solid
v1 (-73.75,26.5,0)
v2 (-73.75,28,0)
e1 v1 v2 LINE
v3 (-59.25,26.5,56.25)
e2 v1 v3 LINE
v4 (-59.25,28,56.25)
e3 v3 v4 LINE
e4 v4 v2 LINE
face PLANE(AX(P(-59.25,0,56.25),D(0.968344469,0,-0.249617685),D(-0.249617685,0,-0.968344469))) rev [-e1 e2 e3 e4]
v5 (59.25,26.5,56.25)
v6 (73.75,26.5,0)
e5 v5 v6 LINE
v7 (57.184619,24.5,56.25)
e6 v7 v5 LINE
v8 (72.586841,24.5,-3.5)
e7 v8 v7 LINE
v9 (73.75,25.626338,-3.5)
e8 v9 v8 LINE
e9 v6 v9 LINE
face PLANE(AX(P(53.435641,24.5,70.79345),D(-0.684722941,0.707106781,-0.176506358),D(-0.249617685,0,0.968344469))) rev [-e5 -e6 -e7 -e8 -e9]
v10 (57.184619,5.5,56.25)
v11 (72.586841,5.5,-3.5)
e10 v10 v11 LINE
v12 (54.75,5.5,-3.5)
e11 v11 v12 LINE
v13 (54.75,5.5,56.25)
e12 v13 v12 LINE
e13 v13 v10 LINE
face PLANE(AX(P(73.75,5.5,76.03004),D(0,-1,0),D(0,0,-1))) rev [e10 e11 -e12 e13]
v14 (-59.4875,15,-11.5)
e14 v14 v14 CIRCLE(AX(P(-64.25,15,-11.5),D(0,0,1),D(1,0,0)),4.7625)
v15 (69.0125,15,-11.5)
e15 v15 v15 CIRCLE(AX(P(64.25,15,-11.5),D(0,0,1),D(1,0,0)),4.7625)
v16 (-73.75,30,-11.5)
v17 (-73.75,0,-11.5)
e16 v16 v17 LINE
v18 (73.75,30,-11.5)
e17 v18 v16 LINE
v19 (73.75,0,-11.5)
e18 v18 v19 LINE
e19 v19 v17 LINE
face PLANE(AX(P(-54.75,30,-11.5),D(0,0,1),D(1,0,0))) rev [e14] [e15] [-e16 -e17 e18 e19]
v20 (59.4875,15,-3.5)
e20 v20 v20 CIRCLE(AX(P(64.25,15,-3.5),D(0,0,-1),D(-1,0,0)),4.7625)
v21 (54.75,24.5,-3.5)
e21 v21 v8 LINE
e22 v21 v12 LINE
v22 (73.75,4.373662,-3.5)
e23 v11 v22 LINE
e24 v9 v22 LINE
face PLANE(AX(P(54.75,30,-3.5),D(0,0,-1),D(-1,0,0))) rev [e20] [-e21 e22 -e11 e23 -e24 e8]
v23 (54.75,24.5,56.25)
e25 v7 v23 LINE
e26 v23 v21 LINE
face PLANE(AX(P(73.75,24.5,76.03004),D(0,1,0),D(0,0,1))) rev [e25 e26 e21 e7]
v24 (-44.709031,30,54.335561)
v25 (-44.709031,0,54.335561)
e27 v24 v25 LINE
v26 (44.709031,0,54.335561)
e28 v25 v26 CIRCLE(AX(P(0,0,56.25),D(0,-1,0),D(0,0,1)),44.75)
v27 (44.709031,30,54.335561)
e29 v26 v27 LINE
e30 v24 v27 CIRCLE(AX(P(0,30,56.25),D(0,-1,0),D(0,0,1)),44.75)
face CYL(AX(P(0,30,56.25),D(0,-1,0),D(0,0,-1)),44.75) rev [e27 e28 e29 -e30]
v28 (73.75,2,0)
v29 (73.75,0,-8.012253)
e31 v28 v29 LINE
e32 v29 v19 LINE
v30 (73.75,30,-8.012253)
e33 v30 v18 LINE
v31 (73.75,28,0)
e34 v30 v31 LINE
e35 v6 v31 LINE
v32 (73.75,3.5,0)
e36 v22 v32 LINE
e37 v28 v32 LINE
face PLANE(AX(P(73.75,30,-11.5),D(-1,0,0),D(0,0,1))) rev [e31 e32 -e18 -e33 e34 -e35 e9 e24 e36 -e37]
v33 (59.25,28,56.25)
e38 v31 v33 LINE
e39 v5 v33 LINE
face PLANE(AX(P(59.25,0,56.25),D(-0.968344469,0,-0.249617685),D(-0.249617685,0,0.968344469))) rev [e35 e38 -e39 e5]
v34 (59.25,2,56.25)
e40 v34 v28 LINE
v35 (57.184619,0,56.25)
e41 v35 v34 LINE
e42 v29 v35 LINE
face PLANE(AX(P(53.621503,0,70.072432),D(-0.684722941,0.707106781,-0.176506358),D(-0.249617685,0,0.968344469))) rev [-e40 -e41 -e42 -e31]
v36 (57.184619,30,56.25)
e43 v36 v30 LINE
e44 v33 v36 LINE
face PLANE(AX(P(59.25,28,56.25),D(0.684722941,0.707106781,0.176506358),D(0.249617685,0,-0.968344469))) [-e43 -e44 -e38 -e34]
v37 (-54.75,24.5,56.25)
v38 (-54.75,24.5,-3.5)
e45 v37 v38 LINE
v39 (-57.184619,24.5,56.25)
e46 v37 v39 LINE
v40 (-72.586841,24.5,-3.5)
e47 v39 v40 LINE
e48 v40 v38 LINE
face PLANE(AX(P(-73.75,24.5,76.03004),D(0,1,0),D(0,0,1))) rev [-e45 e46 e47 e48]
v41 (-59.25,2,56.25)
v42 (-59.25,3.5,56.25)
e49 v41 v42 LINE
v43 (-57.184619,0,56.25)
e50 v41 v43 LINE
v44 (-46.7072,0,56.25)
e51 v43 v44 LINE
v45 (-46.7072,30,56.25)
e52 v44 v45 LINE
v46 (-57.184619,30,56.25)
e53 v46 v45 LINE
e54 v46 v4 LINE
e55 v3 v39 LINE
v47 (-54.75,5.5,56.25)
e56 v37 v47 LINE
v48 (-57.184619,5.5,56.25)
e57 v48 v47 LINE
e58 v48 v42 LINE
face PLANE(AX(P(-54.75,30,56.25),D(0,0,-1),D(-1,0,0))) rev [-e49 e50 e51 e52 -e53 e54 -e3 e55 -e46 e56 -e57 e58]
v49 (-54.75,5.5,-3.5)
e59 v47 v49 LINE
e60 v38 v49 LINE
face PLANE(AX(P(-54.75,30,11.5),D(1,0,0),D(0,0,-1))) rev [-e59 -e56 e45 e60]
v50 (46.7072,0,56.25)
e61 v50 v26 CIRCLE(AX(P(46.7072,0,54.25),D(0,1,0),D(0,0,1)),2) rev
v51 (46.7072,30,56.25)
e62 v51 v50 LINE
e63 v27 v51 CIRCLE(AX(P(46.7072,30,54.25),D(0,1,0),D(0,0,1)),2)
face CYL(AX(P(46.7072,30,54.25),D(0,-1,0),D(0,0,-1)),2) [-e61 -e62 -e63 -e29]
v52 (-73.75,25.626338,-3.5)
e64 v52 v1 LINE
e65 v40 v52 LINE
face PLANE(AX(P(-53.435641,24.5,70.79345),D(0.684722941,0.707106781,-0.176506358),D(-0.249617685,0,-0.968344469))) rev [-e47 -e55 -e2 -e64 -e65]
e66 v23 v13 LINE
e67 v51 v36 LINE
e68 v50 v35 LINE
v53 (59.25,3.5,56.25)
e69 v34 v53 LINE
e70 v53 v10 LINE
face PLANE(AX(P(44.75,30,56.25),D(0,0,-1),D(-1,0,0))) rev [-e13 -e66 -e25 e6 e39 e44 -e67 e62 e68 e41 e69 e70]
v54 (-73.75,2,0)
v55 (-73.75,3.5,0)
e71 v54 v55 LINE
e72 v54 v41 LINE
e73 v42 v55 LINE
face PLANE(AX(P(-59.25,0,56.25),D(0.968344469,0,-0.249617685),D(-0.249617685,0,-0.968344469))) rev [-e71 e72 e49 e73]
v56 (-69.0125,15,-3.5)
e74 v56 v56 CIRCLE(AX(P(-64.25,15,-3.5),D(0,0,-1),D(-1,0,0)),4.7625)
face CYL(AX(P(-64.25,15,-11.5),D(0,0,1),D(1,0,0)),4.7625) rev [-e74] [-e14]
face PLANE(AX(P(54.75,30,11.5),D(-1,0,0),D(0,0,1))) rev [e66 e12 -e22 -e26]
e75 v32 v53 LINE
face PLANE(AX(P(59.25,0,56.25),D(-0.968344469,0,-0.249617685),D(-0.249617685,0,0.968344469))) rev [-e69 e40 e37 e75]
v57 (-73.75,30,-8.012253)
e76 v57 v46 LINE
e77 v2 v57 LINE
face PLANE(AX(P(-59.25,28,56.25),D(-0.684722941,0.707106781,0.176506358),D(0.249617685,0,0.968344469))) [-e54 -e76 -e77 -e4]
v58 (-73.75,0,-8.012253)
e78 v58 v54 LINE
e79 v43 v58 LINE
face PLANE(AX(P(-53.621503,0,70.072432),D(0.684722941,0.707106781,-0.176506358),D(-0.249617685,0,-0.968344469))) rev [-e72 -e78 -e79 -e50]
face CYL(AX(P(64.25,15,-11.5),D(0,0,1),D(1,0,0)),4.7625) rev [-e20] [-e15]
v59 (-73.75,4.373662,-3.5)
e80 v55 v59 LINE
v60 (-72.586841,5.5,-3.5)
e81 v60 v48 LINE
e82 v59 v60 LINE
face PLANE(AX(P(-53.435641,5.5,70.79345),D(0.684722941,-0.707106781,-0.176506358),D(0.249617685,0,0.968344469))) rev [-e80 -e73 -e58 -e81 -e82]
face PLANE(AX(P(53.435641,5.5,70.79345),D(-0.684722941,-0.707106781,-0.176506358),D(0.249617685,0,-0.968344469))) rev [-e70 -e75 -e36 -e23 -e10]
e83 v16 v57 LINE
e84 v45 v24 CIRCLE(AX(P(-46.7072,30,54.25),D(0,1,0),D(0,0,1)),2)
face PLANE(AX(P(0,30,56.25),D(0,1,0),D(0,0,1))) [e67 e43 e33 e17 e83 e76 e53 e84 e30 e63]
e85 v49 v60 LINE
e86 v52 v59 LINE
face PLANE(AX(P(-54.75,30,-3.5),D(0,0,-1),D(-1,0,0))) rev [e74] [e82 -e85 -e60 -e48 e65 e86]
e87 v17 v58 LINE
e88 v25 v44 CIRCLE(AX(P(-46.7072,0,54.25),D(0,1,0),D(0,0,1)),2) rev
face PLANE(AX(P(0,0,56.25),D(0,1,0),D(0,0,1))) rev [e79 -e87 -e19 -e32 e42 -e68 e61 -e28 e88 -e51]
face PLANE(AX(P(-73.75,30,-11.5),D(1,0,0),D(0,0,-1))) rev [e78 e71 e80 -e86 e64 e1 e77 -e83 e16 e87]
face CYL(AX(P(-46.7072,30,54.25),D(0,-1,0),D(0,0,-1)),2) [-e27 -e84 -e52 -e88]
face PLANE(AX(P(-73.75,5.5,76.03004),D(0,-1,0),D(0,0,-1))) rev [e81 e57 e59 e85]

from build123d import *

# Parameters (mm, degrees)
BOSS_EXTRUDE1_DEPTH     = 30
CUT_EXTRUDE2_DEPTH      = 100.544588
CUT_EXTRUDE2_DEPTH_BACK = 100.544588
SKETCH8_R               = 4.7625
SKETCH9_W               = 19
SKETCH9_H               = 5.5
BOSS_EXTRUDE3_DEPTH     = 59.75
CUT_EXTRUDE3_DEPTH      = 98.483973042
CUT_EXTRUDE3_DEPTH_BACK = 98.483973042
CHAMFER4_SIZE           = 2
FILLET2_R               = 2


with BuildPart() as part:
    # Sketch1 → Boss-Extrude1 (new body)
    with BuildSketch(Plane(origin=(0, 0, 0), x_dir=(1, 0, 0), z_dir=(0, 1, 0))):
        with BuildLine():
            Line((-54.75, -11.5), (-54.75, -56.25))
            Line((-54.75, -56.25), (-44.75, -56.25))
            ThreePointArc((-44.75, -56.25), (0, -11.5), (44.75, -56.25))
            Line((44.75, -56.25), (54.75, -56.25))
            Line((54.75, -56.25), (54.75, -11.5))
            Line((54.75, -11.5), (54.75, 3.5))
            Line((54.75, 3.5), (73.75, 3.5))
            Line((73.75, 3.5), (73.75, 11.5))
            Line((73.75, 11.5), (54.75, 11.5))
            Line((54.75, 11.5), (-54.75, 11.5))
            Line((-54.75, 11.5), (-73.75, 11.5))
            Line((-73.75, 11.5), (-73.75, 3.5))
            Line((-73.75, 3.5), (-54.75, 3.5))
            Line((-54.75, 3.5), (-54.75, -11.5))
        make_face()
    extrude(amount=BOSS_EXTRUDE1_DEPTH)

    # Sketch8 → Cut-Extrude2 (cut, two sides: drawn at the far end of the back side and taken through both)
    with BuildSketch(Plane.XY.offset(-3.5).offset(-CUT_EXTRUDE2_DEPTH_BACK)):
        with Locations((-64.25, 15)):
            Circle(SKETCH8_R)
        with Locations((64.25, 15)):
            Circle(SKETCH8_R)
    extrude(amount=CUT_EXTRUDE2_DEPTH + CUT_EXTRUDE2_DEPTH_BACK, mode=Mode.SUBTRACT)

    # Sketch9 → Boss-Extrude3 (add)
    with BuildSketch(Plane.XY.offset(-3.5)):
        with Locations((-64.25, 27.25)):
            Rectangle(SKETCH9_W, SKETCH9_H)
        with Locations((-64.25, 2.75)):
            Rectangle(SKETCH9_W, SKETCH9_H)
        with Locations((64.25, 27.25)):
            Rectangle(SKETCH9_W, SKETCH9_H)
        with Locations((64.25, 2.75)):
            Rectangle(SKETCH9_W, SKETCH9_H)
    extrude(amount=BOSS_EXTRUDE3_DEPTH)

    # Sketch10 → Cut-Extrude3 (cut, two sides: drawn at the far end of the back side and taken through both)
    with BuildSketch(Plane(origin=(0, 30, 0), x_dir=(1, 0, 0), z_dir=(0, 1, 0)).offset(-CUT_EXTRUDE3_DEPTH_BACK)):
        Polygon((-59.25, -56.25), (-73.75, 0), (-73.75, -56.25), align=None)
        Polygon((73.75, -56.25), (59.25, -56.25), (73.75, 0), align=None)
    extrude(amount=CUT_EXTRUDE3_DEPTH + CUT_EXTRUDE3_DEPTH_BACK, mode=Mode.SUBTRACT)

    # Chamfer4
    chamfer4_edges = [part.edges().sort_by_distance(p)[0] for p in [
        (-66.5, 24.5, 28.125),
    ]]
    chamfer(chamfer4_edges, length=CHAMFER4_SIZE)
    chamfer4_2_edges = [part.edges().sort_by_distance(p)[0] for p in [
        (-66.5, 5.5, 28.125),
    ]]
    chamfer(chamfer4_2_edges, length=CHAMFER4_SIZE)
    chamfer4_3_edges = [part.edges().sort_by_distance(p)[0] for p in [
        (-66.5, 0, 28.125),
    ]]
    chamfer(chamfer4_3_edges, length=CHAMFER4_SIZE)
    chamfer4_4_edges = [part.edges().sort_by_distance(p)[0] for p in [
        (66.5, 0, 28.125),
    ]]
    chamfer(chamfer4_4_edges, length=CHAMFER4_SIZE)
    chamfer4_5_edges = [part.edges().sort_by_distance(p)[0] for p in [
        (-66.5, 30, 28.125),
    ]]
    chamfer(chamfer4_5_edges, length=CHAMFER4_SIZE)
    chamfer4_6_edges = [part.edges().sort_by_distance(p)[0] for p in [
        (66.5, 30, 28.125),
    ]]
    chamfer(chamfer4_6_edges, length=CHAMFER4_SIZE)
    chamfer4_7_edges = [part.edges().sort_by_distance(p)[0] for p in [
        (66.5, 5.5, 28.125),
    ]]
    chamfer(chamfer4_7_edges, length=CHAMFER4_SIZE)
    chamfer4_8_edges = [part.edges().sort_by_distance(p)[0] for p in [
        (66.5, 24.5, 28.125),
    ]]
    chamfer(chamfer4_8_edges, length=CHAMFER4_SIZE)

    # Fillet2
    fillet2_edges = [part.edges().sort_by_distance(p)[0] for p in [
        (44.75, 15, 56.25),
        (-44.75, 15, 56.25),
    ]]
    fillet(fillet2_edges, radius=FILLET2_R)


solid = part.part
